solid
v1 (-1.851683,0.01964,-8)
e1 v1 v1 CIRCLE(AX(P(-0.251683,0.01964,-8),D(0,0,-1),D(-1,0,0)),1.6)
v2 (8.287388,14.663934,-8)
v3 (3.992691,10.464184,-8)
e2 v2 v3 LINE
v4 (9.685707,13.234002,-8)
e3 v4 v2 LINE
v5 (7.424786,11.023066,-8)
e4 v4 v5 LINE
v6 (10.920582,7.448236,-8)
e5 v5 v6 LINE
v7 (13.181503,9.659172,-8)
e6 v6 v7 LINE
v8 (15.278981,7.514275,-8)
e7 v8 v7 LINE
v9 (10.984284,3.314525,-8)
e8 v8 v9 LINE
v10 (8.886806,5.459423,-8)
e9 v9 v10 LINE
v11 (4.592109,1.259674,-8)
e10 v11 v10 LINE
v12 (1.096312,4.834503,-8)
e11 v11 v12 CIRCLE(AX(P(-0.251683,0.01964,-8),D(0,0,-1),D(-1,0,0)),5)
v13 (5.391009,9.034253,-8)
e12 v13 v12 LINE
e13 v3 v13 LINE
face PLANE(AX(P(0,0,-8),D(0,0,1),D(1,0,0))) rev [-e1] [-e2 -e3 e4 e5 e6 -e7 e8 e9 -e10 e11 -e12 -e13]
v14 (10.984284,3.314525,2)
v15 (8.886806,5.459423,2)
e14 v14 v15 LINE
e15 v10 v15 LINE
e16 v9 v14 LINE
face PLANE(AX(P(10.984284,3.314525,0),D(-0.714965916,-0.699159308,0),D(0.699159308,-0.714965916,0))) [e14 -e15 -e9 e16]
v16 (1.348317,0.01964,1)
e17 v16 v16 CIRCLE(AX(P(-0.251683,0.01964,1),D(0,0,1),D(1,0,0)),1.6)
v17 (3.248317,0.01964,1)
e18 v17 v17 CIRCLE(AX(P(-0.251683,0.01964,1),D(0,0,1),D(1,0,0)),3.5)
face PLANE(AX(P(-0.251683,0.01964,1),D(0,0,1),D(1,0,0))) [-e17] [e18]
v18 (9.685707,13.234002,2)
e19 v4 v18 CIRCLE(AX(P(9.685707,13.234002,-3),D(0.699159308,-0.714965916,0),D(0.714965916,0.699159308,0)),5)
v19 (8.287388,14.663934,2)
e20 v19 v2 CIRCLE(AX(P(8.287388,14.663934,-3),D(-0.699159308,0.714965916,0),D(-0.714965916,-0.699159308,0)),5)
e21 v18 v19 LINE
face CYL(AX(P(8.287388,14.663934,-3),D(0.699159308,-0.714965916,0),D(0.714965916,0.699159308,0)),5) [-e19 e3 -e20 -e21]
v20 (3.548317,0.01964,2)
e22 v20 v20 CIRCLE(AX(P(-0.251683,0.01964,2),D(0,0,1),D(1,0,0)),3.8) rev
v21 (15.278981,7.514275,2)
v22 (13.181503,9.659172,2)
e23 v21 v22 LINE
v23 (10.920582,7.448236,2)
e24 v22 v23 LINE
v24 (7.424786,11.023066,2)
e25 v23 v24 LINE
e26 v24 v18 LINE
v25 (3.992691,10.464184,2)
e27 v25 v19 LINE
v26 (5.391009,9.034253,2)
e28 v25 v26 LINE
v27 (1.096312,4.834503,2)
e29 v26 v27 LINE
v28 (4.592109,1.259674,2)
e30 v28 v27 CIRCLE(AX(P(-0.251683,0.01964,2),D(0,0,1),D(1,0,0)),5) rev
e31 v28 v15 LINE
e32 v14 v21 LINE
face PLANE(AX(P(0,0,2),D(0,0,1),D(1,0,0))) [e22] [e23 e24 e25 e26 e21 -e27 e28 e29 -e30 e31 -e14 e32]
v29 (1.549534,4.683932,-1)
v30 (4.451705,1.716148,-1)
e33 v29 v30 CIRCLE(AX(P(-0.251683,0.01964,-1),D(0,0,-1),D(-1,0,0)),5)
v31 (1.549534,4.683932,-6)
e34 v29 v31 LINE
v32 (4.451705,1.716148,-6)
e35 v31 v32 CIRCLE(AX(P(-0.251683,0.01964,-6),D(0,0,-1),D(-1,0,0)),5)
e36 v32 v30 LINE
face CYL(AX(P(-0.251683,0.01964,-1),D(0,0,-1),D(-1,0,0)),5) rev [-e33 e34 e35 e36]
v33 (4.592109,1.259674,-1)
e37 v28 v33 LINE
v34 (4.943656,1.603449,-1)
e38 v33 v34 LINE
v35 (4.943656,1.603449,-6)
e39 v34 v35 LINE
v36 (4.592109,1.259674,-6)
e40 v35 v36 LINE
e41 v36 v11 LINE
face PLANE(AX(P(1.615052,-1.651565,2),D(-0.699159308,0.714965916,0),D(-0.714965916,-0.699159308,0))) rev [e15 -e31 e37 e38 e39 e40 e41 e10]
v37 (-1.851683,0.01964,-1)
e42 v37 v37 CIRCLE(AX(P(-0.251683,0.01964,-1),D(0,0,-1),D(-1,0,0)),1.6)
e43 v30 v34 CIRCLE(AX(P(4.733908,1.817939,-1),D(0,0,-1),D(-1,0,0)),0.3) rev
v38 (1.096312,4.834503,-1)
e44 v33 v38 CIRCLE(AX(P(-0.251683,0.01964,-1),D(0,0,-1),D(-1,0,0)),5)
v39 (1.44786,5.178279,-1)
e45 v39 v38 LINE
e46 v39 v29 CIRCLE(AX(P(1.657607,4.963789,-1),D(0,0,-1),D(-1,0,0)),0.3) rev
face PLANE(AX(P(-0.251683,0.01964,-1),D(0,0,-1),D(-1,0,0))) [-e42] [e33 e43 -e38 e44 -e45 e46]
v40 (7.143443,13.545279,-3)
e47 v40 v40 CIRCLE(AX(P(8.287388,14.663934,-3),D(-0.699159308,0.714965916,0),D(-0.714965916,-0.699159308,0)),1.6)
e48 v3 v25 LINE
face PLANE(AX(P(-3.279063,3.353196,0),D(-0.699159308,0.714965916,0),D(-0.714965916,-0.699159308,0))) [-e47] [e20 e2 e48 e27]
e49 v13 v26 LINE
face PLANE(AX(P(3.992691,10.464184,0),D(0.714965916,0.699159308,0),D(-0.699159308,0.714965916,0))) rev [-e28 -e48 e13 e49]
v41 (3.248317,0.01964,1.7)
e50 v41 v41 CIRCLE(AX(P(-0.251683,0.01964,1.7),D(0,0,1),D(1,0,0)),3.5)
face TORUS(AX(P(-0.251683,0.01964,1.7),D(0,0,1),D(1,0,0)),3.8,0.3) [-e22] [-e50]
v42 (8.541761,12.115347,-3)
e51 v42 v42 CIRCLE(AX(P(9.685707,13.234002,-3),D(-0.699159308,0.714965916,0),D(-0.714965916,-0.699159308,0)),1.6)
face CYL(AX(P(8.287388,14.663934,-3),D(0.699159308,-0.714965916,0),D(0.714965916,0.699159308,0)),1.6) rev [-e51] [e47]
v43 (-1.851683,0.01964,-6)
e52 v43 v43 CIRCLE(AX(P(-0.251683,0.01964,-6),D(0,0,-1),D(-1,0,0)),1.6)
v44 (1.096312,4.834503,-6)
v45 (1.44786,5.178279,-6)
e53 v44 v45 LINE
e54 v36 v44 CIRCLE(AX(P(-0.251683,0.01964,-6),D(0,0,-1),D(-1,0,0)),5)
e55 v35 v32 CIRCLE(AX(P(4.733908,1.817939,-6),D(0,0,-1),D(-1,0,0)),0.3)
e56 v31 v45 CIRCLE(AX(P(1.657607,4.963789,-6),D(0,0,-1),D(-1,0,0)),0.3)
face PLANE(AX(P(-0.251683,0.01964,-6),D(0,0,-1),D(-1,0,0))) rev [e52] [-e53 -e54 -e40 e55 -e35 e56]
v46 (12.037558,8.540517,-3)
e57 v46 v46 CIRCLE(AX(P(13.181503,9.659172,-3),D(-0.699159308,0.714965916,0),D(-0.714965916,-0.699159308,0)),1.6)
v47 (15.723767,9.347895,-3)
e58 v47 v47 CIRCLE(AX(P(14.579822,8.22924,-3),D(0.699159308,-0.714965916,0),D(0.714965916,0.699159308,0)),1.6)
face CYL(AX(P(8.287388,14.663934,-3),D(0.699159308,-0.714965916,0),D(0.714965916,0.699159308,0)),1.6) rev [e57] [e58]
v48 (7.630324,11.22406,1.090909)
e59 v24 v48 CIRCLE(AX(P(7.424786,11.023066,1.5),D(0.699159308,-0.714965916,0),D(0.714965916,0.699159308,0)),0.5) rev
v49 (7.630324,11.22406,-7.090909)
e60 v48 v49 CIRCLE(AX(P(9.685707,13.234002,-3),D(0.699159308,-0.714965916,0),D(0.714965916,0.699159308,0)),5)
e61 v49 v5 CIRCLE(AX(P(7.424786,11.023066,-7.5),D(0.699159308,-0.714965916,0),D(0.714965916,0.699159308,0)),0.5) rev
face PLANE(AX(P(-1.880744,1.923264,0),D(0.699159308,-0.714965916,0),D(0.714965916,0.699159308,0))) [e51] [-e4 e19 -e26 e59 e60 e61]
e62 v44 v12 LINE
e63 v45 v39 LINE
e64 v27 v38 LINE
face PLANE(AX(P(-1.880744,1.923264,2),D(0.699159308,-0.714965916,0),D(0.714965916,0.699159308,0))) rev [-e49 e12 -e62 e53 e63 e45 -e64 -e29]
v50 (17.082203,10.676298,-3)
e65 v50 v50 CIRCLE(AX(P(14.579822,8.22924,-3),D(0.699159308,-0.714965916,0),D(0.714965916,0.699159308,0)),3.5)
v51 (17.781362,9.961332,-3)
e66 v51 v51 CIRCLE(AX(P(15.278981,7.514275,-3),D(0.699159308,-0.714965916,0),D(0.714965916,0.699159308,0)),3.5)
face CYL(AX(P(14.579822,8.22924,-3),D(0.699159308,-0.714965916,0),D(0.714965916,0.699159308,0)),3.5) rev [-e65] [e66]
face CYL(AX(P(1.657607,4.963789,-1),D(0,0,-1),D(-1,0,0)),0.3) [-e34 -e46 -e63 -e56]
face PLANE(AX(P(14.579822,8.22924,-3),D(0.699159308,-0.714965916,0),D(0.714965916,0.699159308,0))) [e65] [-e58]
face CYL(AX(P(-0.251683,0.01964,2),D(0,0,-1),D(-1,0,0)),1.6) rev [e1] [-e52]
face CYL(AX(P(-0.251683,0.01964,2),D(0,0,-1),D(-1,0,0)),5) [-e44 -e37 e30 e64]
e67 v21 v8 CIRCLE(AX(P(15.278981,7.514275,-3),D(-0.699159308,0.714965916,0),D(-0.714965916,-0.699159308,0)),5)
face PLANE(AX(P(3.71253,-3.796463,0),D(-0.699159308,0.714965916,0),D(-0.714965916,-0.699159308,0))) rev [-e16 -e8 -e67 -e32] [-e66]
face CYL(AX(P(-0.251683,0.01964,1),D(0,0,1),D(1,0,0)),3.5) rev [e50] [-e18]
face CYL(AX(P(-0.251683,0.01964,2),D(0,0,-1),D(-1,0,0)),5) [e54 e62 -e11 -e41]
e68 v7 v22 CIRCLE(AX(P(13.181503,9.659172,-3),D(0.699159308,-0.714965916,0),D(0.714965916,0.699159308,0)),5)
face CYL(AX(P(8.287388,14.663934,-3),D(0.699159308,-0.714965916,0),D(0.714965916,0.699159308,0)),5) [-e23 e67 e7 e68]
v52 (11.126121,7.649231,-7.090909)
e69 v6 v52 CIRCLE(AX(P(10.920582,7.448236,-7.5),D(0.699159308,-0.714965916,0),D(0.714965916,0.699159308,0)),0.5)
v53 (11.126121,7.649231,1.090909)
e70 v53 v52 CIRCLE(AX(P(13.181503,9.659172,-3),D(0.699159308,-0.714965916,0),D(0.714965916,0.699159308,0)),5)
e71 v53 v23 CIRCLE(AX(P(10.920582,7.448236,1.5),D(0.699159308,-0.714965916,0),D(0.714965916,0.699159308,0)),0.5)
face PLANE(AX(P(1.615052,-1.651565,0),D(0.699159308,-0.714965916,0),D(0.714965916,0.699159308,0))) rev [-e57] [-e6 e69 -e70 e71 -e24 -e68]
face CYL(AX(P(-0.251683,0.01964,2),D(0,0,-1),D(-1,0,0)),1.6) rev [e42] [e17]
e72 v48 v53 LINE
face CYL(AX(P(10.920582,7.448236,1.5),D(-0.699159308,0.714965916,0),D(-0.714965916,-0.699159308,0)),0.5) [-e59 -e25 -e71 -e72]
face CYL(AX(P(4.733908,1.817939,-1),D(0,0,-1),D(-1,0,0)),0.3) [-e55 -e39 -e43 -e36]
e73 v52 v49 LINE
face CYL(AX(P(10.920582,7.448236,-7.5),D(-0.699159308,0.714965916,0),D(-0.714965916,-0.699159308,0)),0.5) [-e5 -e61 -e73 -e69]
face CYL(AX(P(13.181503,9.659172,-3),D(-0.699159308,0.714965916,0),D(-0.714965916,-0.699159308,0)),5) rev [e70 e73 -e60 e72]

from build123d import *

# Parameters (mm, degrees)
SKETCH1_R               = 1.6
BOSS_EXTRUDE1_DEPTH     = 2
BOSS_EXTRUDE2_START     = -8
SKETCH1_3_R             = 1.6
BOSS_EXTRUDE2_DEPTH     = 8
SKETCH2_R               = 5
CUT_EXTRUDE1_DEPTH      = 5
SKETCH7_R               = 1.6
BOSS_EXTRUDE5_DEPTH     = 2
BOSS_EXTRUDE6_START     = -8
BOSS_EXTRUDE6_OUTLINE_R = 1.6
BOSS_EXTRUDE6_DEPTH     = 8
CUT_EXTRUDE4_START      = 5
SKETCH8_R               = 5
CUT_EXTRUDE4_DEPTH      = 5
SKETCH10_R              = 3.5
SKETCH10_R_2            = 1.6
CUT_EXTRUDE5_DEPTH      = 1
FILLET2_R               = 0.5
FILLET3_R               = 0.3
CUT_EXTRUDE6_START      = -1
SKETCH11_R              = 3.5
SKETCH11_R_2            = 1.6
CUT_EXTRUDE6_DEPTH      = 1
FILLET4_R               = 0.3


# Read off the part's stored shape, not the designer's step: Boss-Extrude6
with BuildPart() as part:
    # Sketch1 → Boss-Extrude1 (new body)
    with BuildSketch(Plane.XY):
        with BuildLine():
            Line((13.181503179, 9.65917228), (9.685706637, 13.234001861))
            Line((9.685706637, 13.234001861), (1.09631205, 4.834503308))
            ThreePointArc((1.09631205, 4.834503308), (-3.826512492, -3.476156637), (4.592108592, 1.259673726))
            Line((4.592108592, 1.259673726), (13.181503179, 9.65917228))
        make_face()
        with Locations((-0.251682911, 0.019639905)):
            Circle(SKETCH1_R, mode=Mode.SUBTRACT)
    extrude(amount=BOSS_EXTRUDE1_DEPTH)

    # Sketch1<3> → Boss-Extrude2 (add)
    with BuildSketch(Plane.XY.offset(BOSS_EXTRUDE2_START)):
        with BuildLine():
            Line((13.181503179, 9.65917228), (9.685706637, 13.234001861))
            Line((9.685706637, 13.234001861), (1.09631205, 4.834503308))
            ThreePointArc((1.09631205, 4.834503308), (-3.826512492, -3.476156637), (4.592108592, 1.259673726))
            Line((4.592108592, 1.259673726), (13.181503179, 9.65917228))
        make_face()
        with Locations(Location((-0.251682911, 0.019639905, 0), (0, 0, 180))):
            Circle(SKETCH1_3_R, mode=Mode.SUBTRACT)
    extrude(amount=BOSS_EXTRUDE2_DEPTH)

    # Sketch2 → Cut-Extrude1 (cut)
    with BuildSketch(Plane(origin=(0, 0, -6), x_dir=(-1, 0, 0), z_dir=(0, 0, -1))):
        with Locations((0.251682911, 0.019639905)):
            Circle(SKETCH2_R)
    extrude(amount=-CUT_EXTRUDE1_DEPTH, mode=Mode.SUBTRACT)

    # Sketch7 → Boss-Extrude5 (add)
    with BuildSketch(Plane(origin=(-1.880744352, 1.923264258, 0), x_dir=(0.7149659162500773, 0.6991593084560109, 0), z_dir=(-0.6991593084560109, 0.7149659162500773, 0))):
        with BuildLine():
            Line((16.17762571, 8), (10.170769724, 8))
            Line((10.170769724, 8), (10.170769724, -2))
            Line((10.170769724, -2), (16.17762571, -2))
            ThreePointArc((16.17762571, -2), (21.17762571, 3), (16.17762571, 8))
        make_face()
        with Locations(Location((16.17762571, 3, 0), (0, 0, 270))):
            Circle(SKETCH7_R, mode=Mode.SUBTRACT)
    extrude(amount=BOSS_EXTRUDE5_DEPTH)

    # Boss-Extrude6 outline → Boss-Extrude6 (add)
    with BuildSketch(Plane(origin=(-1.880744352, 1.923264258, 0), x_dir=(0.7149659162500773, 0.6991593084560109, 0), z_dir=(-0.6991593084560109, 0.7149659162500773, 0)).offset(BOSS_EXTRUDE6_START)):
        with BuildLine():
            Line((10.170769724, 8), (10.170769724, -2))
            Line((10.170769724, -2), (16.17762571, -2))
            ThreePointArc((16.17762571, -2), (21.17762571, 3), (16.17762571, 8))
            Line((16.17762571, 8), (10.170769724, 8))
        make_face()
        with Locations((16.17762571, 3)):
            Circle(BOSS_EXTRUDE6_OUTLINE_R, mode=Mode.SUBTRACT)
    extrude(amount=BOSS_EXTRUDE6_DEPTH)

    # Sketch8 → Cut-Extrude4 (cut)
    with BuildSketch(Plane(origin=(-1.880744352, 1.923264258, 0), x_dir=(0.7149659162500772, 0.699159308456011, 0), z_dir=(0.699159308456011, -0.7149659162500772, 0)).offset(CUT_EXTRUDE4_START)):
        with Locations((16.17762571, -3)):
            Circle(SKETCH8_R)
    extrude(amount=-CUT_EXTRUDE4_DEPTH, mode=Mode.SUBTRACT)

    # Sketch10 → Cut-Extrude5 (cut)
    with BuildSketch(Plane(origin=(3.712530116, -3.796463072, 0), x_dir=(0.7149659162500772, 0.699159308456011, 0), z_dir=(0.699159308456011, -0.7149659162500772, 0))):
        with Locations((16.17762571, -3)):
            Circle(SKETCH10_R)
        with Locations((16.17762571, -3)):
            Circle(SKETCH10_R_2, mode=Mode.SUBTRACT)
    extrude(amount=-CUT_EXTRUDE5_DEPTH, mode=Mode.SUBTRACT)

    # Fillet2
    fillet2_edges = [part.edges().sort_by_distance(p)[0] for p in [
        (11.433604908, 11.446587071, 2),
        (11.433604908, 11.446587071, -8),
    ]]
    fillet(fillet2_edges, radius=FILLET2_R)

    # Fillet3
    fillet3_edges = [part.edges().sort_by_distance(p)[0] for p in [
        (4.592108592, 1.259673726, -3.5),
        (1.09631205, 4.834503308, -3.5),
    ]]
    fillet(fillet3_edges, radius=FILLET3_R)

    # Sketch11 → Cut-Extrude6 (cut)
    with BuildSketch(Plane.XY.offset(2).offset(CUT_EXTRUDE6_START)):
        with Locations((-0.251682911, 0.019639905)):
            Circle(SKETCH11_R)
        with Locations(Location((-0.251682911, 0.019639905, 0), (0, 0, 180))):
            Circle(SKETCH11_R_2, mode=Mode.SUBTRACT)
    extrude(amount=CUT_EXTRUDE6_DEPTH, mode=Mode.SUBTRACT)

    # Fillet4
    fillet4_edges = [part.edges().sort_by_distance(p)[0] for p in [
        (-3.751682911, 0.019639905, 2),
    ]]
    fillet(fillet4_edges, radius=FILLET4_R)


solid = part.part
